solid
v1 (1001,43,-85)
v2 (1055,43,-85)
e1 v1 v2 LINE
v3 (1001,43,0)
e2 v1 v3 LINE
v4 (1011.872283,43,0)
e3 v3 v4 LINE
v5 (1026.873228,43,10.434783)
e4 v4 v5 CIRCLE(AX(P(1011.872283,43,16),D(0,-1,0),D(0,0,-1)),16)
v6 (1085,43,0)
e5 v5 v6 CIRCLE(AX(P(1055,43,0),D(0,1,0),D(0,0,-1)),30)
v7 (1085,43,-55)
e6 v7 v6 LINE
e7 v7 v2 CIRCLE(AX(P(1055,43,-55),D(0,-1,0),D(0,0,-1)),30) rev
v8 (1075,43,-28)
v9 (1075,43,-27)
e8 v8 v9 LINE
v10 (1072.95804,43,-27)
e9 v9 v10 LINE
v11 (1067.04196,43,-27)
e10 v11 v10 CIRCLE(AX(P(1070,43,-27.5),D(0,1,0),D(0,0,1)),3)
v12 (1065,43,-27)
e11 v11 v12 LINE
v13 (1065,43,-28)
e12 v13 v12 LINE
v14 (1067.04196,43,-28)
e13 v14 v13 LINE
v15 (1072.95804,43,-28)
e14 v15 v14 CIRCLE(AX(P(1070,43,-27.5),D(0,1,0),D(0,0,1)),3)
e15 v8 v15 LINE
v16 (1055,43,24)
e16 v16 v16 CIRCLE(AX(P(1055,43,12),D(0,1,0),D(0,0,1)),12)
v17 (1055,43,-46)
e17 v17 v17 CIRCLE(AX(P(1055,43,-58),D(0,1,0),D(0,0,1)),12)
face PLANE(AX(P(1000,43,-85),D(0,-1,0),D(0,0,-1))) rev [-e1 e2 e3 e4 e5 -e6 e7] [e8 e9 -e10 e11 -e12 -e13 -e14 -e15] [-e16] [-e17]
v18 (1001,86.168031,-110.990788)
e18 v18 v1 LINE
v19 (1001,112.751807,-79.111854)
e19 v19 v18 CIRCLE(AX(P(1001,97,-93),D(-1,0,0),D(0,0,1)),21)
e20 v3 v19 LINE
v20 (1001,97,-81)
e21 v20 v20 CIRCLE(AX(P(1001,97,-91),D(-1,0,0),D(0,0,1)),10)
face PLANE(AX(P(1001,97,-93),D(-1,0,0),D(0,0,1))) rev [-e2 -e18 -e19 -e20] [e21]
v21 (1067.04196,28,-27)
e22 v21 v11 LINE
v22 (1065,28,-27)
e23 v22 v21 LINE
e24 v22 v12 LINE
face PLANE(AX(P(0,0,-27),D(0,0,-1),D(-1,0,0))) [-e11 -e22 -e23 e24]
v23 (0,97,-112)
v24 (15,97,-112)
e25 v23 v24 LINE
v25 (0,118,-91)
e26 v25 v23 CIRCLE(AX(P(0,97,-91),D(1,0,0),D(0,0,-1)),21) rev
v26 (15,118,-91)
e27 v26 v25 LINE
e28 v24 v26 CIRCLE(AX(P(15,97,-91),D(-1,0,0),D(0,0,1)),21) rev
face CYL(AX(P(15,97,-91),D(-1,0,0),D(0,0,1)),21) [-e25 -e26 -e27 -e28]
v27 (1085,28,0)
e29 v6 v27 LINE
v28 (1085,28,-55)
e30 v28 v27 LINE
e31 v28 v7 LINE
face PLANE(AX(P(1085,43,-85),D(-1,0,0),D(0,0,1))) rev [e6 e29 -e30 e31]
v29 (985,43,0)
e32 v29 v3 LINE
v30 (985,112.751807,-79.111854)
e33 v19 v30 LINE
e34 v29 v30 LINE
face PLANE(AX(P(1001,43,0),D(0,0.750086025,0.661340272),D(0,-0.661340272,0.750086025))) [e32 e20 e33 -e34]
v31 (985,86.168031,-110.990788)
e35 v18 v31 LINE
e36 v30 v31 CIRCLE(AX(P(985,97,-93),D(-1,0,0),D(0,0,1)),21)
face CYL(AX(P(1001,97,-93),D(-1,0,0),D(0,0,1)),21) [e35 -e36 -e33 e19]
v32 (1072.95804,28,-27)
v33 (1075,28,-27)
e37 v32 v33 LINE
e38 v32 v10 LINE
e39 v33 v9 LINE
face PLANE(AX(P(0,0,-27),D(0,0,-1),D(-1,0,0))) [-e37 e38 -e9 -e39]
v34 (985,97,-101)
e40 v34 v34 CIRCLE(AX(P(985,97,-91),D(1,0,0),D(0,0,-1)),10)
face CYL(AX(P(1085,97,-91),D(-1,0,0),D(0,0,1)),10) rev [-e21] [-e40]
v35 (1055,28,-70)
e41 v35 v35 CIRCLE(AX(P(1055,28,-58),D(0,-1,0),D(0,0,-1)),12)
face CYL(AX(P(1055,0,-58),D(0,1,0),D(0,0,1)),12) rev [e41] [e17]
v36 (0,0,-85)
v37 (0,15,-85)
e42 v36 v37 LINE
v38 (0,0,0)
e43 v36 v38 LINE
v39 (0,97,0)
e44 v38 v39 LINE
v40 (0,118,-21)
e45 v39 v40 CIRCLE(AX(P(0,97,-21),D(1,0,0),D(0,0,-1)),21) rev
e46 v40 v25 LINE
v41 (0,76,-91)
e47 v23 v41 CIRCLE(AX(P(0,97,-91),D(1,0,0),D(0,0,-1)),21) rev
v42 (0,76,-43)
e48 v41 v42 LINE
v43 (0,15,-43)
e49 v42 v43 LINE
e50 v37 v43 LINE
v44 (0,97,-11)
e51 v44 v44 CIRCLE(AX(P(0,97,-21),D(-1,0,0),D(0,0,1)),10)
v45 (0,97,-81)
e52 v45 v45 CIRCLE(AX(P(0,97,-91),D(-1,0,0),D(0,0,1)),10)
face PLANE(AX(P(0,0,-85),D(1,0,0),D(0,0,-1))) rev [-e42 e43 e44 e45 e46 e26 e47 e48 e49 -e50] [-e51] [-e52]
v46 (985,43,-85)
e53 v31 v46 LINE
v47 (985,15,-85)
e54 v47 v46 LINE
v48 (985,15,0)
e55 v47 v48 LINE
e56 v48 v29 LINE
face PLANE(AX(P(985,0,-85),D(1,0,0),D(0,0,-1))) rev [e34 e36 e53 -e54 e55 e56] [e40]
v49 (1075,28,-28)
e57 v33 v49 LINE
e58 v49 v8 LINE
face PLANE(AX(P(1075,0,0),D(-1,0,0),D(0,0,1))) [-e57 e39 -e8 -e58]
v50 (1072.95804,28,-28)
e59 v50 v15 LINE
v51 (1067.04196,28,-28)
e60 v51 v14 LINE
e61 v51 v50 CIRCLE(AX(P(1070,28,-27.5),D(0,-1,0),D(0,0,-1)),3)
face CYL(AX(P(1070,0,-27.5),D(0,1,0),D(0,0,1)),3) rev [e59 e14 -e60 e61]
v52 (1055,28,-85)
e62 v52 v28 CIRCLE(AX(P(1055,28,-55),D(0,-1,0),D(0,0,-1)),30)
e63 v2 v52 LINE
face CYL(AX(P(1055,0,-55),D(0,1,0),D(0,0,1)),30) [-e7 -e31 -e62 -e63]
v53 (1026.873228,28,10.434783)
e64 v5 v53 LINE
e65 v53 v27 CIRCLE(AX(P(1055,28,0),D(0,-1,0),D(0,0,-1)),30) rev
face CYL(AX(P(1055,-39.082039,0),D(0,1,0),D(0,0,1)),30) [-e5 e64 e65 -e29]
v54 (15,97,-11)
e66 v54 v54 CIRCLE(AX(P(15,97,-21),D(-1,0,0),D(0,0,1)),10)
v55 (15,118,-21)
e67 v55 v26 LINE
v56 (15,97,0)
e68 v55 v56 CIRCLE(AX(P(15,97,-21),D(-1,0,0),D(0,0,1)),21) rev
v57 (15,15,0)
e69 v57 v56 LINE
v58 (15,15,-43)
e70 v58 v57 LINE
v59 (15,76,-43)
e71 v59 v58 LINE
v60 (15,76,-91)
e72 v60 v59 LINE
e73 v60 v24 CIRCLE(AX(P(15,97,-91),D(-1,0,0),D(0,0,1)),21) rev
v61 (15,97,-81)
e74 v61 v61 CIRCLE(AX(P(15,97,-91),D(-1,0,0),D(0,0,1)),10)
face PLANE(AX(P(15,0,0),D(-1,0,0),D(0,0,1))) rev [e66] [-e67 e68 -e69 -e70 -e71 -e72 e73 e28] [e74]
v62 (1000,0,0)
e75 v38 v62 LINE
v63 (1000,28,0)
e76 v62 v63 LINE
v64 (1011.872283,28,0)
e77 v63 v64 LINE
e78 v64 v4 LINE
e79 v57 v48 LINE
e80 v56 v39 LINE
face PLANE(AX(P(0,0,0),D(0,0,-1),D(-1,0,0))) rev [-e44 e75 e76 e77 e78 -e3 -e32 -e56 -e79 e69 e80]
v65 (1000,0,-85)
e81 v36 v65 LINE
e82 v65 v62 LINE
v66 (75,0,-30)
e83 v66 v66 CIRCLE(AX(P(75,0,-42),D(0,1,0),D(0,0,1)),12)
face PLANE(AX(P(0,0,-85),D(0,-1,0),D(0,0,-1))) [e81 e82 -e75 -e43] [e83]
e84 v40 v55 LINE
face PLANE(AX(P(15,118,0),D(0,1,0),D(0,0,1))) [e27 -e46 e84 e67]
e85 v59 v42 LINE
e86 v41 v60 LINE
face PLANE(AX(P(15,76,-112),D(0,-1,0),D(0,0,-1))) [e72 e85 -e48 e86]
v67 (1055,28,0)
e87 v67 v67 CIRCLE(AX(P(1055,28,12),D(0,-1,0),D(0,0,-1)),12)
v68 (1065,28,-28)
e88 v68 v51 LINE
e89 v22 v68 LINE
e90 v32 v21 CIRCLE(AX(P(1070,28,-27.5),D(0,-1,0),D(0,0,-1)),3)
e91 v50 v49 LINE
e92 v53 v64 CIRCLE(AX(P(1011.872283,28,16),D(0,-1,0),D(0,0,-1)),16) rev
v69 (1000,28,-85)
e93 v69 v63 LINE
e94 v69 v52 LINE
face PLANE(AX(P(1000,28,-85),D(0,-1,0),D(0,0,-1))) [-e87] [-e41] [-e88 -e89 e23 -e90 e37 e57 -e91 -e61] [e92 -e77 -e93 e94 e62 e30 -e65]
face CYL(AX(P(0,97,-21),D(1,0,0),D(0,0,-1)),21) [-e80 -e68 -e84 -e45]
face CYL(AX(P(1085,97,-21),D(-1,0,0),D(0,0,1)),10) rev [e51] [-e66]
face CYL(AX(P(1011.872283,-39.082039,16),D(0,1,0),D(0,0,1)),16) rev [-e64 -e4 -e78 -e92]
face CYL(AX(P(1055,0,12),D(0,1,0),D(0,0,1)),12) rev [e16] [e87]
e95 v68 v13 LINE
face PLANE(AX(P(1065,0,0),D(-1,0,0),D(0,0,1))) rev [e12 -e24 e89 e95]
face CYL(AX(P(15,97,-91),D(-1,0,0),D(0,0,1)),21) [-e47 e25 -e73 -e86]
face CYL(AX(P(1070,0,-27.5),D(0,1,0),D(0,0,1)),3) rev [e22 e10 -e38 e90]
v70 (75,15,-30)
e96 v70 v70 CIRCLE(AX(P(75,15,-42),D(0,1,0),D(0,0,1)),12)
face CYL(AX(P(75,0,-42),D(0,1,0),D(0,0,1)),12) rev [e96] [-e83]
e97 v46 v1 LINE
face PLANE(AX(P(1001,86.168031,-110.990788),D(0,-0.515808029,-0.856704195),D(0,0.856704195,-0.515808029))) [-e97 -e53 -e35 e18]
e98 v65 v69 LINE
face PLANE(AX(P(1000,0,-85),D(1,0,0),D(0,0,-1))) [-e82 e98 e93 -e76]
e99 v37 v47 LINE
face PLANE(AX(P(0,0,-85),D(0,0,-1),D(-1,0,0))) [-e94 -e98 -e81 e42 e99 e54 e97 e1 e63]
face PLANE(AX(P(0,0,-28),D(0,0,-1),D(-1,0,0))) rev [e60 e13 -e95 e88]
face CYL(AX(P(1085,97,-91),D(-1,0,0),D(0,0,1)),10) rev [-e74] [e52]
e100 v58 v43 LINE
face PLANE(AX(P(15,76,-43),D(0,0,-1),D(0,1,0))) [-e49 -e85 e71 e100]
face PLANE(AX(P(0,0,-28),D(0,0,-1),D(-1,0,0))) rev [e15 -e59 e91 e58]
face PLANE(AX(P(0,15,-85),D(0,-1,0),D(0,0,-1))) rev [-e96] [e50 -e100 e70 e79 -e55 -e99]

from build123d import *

# Parameters (mm, degrees)
EXTRUDE_THIN1_DEPTH = 85
BOSS_EXTRUDE1_DEPTH = 15
BOSS_EXTRUDE2_DEPTH = 16
FILLET1_R           = 21
BOSS_EXTRUDE3_DEPTH = 15
FILLET2_R           = 16
SKETCH6_R           = 12
CUT_EXTRUDE2_DEPTH  = 1094.547438386
FILLET3_R           = 30
SKETCH7_R           = 12
CUT_EXTRUDE3_DEPTH  = 1096.823890961
SKETCH9_R           = 10
CUT_EXTRUDE4_DEPTH  = 1098.335409071
CUT_EXTRUDE5_DEPTH  = 1094.547438386


with BuildPart() as part:
    # Sketch1 → Extrude-Thin1 (new body)
    with BuildSketch(Plane.XY):
        Polygon((0, 0), (1000, 0), (1000, 28), (1085, 28), (1085, 43), (985, 43), (985, 15), (0, 15), align=None)
    extrude(amount=-EXTRUDE_THIN1_DEPTH)

    # Sketch2 → Boss-Extrude1 (add)
    with BuildSketch(Plane.ZY):
        Polygon((0, 15), (0, 118), (-112, 118), (-112, 76), (-43, 76), (-43, 15), align=None)
    extrude(amount=-BOSS_EXTRUDE1_DEPTH)

    # Sketch3 → Boss-Extrude2 (add)
    with BuildSketch(Plane.ZY.offset(-985)):
        with BuildLine():
            Line((0, 43), (-79.111854281, 112.751806515))
            ThreePointArc((-79.111854281, 112.751806515), (-106.449245092, 113.128168106), (-110.990788091, 86.168031394))
            Line((-110.990788091, 86.168031394), (-85, 43))
            Line((-85, 43), (0, 43))
        make_face()
    extrude(amount=-BOSS_EXTRUDE2_DEPTH)

    # Fillet1
    fillet1_edges = [part.edges().sort_by_distance(p)[0] for p in [
        (7.5, 76, -112),
        (7.5, 118, -112),
        (7.5, 118, 0),
    ]]
    fillet(fillet1_edges, radius=FILLET1_R - 0.0001)  # a hair under: the kernel refuses the full size

    # Sketch5 → Boss-Extrude3 (add)
    with BuildSketch(Plane(origin=(0, 43, 0), x_dir=(1, 0, 0), z_dir=(0, 1, 0))):
        with BuildLine():
            Line((1025, 0), (1085, 0))
            ThreePointArc((1085, 0), (1055, -30), (1025, 0))
        make_face()
    extrude(amount=-BOSS_EXTRUDE3_DEPTH)

    # Fillet2
    fillet2_edges = [part.edges().sort_by_distance(p)[0] for p in [
        (1025, 35.5, 0),
    ]]
    fillet(fillet2_edges, radius=FILLET2_R)

    # Sketch6 → Cut-Extrude2 (cut, through all)
    with BuildSketch(Plane(origin=(0, 43, 0), x_dir=(1, 0, 0), z_dir=(0, 1, 0))):
        with Locations(Location((1055, -12, 0), (0, 0, 270))):
            Circle(SKETCH6_R)
        with Locations(Location((1055, 58, 0), (0, 0, 270))):
            Circle(SKETCH6_R)
    extrude(amount=-CUT_EXTRUDE2_DEPTH, mode=Mode.SUBTRACT)

    # Fillet3
    fillet3_edges = [part.edges().sort_by_distance(p)[0] for p in [
        (1085, 35.5, -85),
    ]]
    fillet(fillet3_edges, radius=FILLET3_R)

    # Sketch7 → Cut-Extrude3 (cut, through all)
    with BuildSketch(Plane(origin=(0, 15, 0), x_dir=(1, 0, 0), z_dir=(0, 1, 0))):
        with Locations(Location((75, 42, 0), (0, 0, 270))):
            Circle(SKETCH7_R)
    extrude(amount=-CUT_EXTRUDE3_DEPTH, mode=Mode.SUBTRACT)

    # Sketch9 → Cut-Extrude4 (cut, through all)
    with BuildSketch(Plane.ZY):
        with Locations((-91, 97)):
            Circle(SKETCH9_R)
        with Locations((-21, 97)):
            Circle(SKETCH9_R)
    extrude(amount=-CUT_EXTRUDE4_DEPTH, mode=Mode.SUBTRACT)

    # Sketch10 → Cut-Extrude5 (cut, through all)
    with BuildSketch(Plane(origin=(0, 43, 0), x_dir=(1, 0, 0), z_dir=(0, 1, 0))):
        with BuildLine():
            Line((1067.041960108, 28), (1072.958039892, 28))
            ThreePointArc((1072.958039892, 28), (1070, 30.5), (1067.041960108, 28))
        make_face()
        with BuildLine():
            ThreePointArc((1067.041960108, 27), (1070, 24.5), (1072.958039892, 27))
            Line((1072.958039892, 27), (1067.041960108, 27))
        make_face()
        with BuildLine():
            Line((1075, 27), (1075, 28))
            Line((1075, 28), (1072.958039892, 28))
            ThreePointArc((1072.958039892, 28), (1072.989491568, 27.750878781), (1073, 27.5))
            ThreePointArc((1073, 27.5), (1072.989491568, 27.249121219), (1072.958039892, 27))
            Line((1072.958039892, 27), (1075, 27))
        make_face()
        with BuildLine():
            ThreePointArc((1067.041960108, 27), (1067, 27.5), (1067.041960108, 28))
            Line((1067.041960108, 28), (1065, 28))
            Line((1065, 28), (1065, 27))
            Line((1065, 27), (1067.041960108, 27))
        make_face()
        with BuildLine():
            ThreePointArc((1073, 27.5), (1072.989491568, 27.750878781), (1072.958039892, 28))
            Line((1072.958039892, 28), (1067.041960108, 28))
            ThreePointArc((1067.041960108, 28), (1067, 27.5), (1067.041960108, 27))
            Line((1067.041960108, 27), (1072.958039892, 27))
            ThreePointArc((1072.958039892, 27), (1072.989491568, 27.249121219), (1073, 27.5))
        make_face()
    extrude(amount=-CUT_EXTRUDE5_DEPTH, mode=Mode.SUBTRACT)


solid = part.part
